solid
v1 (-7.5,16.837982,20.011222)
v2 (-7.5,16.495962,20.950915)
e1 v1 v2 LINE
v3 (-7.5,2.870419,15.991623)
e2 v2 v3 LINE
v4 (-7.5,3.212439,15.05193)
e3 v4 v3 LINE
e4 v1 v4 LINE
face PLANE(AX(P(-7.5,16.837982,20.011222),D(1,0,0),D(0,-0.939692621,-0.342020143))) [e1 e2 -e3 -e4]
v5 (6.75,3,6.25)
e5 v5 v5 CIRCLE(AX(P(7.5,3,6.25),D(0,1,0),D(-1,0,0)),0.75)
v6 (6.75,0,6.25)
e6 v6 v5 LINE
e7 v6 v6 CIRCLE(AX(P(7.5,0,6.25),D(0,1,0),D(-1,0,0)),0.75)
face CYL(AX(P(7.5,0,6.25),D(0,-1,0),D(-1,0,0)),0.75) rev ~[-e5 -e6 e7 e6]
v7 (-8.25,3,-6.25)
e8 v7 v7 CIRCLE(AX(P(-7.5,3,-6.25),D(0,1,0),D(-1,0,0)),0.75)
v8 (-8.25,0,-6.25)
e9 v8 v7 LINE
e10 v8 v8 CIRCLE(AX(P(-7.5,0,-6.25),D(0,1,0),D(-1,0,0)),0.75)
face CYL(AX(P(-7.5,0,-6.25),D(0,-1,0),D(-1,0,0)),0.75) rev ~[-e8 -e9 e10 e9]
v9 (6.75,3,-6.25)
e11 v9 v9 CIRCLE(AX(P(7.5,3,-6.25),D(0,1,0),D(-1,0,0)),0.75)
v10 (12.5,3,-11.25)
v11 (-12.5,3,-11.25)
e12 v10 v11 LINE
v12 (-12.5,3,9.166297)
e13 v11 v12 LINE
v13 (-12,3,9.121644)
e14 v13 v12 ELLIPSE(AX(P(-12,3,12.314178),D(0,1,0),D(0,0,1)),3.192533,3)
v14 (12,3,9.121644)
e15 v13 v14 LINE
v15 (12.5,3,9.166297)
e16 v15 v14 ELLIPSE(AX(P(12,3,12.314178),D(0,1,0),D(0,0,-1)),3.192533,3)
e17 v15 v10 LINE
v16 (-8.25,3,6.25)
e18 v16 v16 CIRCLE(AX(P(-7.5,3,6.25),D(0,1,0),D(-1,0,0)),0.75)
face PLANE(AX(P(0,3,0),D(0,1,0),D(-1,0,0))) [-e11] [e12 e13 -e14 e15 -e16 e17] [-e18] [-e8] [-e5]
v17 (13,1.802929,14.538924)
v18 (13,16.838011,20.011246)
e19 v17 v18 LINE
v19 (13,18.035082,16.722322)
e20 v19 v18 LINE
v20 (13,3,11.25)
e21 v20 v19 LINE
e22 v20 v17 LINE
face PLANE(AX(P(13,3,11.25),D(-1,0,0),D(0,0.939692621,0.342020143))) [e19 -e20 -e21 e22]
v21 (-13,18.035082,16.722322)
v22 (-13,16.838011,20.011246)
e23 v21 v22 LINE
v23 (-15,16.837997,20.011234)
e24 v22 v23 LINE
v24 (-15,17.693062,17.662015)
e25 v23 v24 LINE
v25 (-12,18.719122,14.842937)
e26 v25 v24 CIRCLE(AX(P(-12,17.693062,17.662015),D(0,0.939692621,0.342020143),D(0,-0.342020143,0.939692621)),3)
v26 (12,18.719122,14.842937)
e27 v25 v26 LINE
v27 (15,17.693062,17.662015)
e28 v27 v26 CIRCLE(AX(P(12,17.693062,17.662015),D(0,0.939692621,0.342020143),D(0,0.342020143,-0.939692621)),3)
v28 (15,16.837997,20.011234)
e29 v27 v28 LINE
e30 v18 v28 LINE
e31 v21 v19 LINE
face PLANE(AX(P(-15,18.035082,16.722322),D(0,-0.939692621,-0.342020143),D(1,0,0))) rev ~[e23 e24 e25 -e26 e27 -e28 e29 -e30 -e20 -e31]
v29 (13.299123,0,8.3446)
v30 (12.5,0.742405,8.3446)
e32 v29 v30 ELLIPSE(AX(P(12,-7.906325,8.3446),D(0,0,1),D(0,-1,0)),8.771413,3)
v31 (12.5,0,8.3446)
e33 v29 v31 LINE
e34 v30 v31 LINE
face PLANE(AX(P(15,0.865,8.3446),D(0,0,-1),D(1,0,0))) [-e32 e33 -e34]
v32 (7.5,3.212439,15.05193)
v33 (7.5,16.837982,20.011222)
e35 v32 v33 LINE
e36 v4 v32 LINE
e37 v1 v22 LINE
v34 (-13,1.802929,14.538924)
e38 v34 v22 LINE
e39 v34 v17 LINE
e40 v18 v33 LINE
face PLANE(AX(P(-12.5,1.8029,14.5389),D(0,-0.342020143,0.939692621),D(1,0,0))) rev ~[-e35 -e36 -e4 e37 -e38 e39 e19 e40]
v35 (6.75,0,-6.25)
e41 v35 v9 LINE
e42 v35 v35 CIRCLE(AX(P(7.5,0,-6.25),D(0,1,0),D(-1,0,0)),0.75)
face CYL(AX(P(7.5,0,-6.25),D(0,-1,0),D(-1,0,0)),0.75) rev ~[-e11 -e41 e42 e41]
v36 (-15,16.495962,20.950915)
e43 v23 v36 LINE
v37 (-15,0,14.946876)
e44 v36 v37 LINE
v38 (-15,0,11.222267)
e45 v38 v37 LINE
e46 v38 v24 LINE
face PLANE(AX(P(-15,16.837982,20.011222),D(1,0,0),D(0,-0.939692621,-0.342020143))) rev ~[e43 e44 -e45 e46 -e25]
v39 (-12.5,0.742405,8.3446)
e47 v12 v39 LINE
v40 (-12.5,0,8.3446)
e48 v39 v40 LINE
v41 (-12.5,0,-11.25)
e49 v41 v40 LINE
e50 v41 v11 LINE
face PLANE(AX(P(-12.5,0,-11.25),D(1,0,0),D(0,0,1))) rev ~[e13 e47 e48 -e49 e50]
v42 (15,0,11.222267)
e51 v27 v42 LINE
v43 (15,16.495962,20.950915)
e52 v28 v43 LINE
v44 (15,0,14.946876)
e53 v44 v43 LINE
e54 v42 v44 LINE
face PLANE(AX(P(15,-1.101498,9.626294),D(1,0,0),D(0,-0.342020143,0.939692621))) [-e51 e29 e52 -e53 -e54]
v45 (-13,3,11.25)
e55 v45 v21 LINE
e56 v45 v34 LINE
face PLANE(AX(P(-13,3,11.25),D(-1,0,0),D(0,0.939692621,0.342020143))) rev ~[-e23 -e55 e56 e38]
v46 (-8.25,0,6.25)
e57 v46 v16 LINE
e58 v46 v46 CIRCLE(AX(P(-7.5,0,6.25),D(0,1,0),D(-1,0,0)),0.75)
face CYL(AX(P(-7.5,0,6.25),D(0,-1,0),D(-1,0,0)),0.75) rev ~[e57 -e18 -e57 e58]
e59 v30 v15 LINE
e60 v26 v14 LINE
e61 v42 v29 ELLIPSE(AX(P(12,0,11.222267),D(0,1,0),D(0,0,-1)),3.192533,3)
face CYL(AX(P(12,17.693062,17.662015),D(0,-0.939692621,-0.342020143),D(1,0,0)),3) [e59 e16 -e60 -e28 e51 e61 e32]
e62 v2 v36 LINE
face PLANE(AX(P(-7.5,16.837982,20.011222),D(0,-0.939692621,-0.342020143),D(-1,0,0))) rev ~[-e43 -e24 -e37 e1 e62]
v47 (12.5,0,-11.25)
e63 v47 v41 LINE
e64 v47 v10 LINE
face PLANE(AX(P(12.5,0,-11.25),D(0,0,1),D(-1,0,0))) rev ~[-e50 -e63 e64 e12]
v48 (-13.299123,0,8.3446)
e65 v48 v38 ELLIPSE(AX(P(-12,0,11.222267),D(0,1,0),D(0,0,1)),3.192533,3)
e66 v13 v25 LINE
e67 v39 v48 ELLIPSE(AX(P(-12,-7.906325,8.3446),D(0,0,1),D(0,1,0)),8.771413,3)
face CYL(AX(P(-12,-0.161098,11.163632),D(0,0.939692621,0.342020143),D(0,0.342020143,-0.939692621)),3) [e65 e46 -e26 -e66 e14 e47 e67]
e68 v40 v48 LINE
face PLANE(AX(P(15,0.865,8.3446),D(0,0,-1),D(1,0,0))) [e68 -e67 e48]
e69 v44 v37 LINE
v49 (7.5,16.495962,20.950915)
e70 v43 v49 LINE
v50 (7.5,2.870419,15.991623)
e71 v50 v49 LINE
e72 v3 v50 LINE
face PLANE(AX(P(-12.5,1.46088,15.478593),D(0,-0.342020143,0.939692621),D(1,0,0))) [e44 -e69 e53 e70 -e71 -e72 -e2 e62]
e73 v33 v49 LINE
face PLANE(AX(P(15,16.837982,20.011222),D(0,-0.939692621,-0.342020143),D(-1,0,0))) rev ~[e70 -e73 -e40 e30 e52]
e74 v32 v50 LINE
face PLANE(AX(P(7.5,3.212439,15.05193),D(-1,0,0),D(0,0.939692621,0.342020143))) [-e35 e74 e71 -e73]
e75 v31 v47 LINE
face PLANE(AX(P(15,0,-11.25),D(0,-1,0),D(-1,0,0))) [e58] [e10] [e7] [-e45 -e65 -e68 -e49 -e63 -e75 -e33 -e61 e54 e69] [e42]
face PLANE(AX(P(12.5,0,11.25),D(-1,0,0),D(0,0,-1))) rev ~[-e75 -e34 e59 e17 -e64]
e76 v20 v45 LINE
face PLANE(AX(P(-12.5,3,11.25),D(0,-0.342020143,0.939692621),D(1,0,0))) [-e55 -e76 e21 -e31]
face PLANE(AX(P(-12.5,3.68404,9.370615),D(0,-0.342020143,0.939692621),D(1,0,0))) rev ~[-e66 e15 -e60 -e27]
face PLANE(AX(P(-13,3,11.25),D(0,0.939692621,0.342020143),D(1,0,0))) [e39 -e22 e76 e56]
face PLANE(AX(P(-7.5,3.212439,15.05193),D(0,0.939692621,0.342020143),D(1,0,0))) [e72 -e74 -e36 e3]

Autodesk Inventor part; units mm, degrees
ref_plane "YZ Plane" through (0, 0, 0) normal (1, 0, 0) x (0, 1, 0)
ref_plane "XZ Plane" through (0, 0, 0) normal (0, 1, 0) x (-1, 0, 0)
sketch "Sketch1" plane through (0, 0, 0) normal (0, 1, 0) x (-1, 0, 0)
  line L0 (12.5, 11.25) -> (-12.5, 11.25)
  line L1 (-12.5, 11.25) -> (-12.5, -11.25)
  line L2 (-12.5, -11.25) -> (12.5, -11.25)
  line L3 (12.5, -11.25) -> (12.5, 11.25)
  line L4 (12.5, 11.25) -> (-12.5, -11.25) construction
  line L5 (-12.5, 11.25) -> (12.5, -11.25) construction
  line L6 (7.5, 6.25) -> (-7.5, 6.25) construction
  line L7 (-7.5, 6.25) -> (-7.5, -6.25) construction
  line L8 (-7.5, -6.25) -> (7.5, -6.25) construction
  line L9 (7.5, -6.25) -> (7.5, 6.25) construction
  line L10 (7.5, 6.25) -> (-7.5, -6.25) construction
  line L11 (-7.5, 6.25) -> (7.5, -6.25) construction
  circle A0 centre (7.5, -6.25) radius 0.75
  circle A1 centre (-7.5, -6.25) radius 0.75
  circle A2 centre (-7.5, 6.25) radius 0.75
  circle A3 centre (7.5, 6.25) radius 0.75
  point P0 (0, 0)
  dimension "d0" = 12.5
  dimension "d1" = 15
  dimension "d2" = 5
  dimension "d3" = 5
  dimension "d4" = 1.5
  dimension "d5" = 1.5
  dimension "d6" = 1.5
  dimension "d7" = 1.5
extrude "Extrusion1" add sketch "Sketch1" along normal blind 3
ref_plane "Work Plane1" through (-12.5, 3, 11.25) normal (0, -0.3420201, 0.9396926) x (1, 0, 0)
sketch "Sketch2" plane through (-12.5, 3, 11.25) normal (0, -0.3420201, 0.9396926) x (1, 0, 0)
  line L0 (0, -7.6955) -> (0, 0) construction
  line L1 (25, 0) -> (25, -7.6955) construction
  line L2 (0, 0) -> (25, 0) construction
  line L3 (-2.5, 16) -> (27.5, 16)
  line L4 (27.5, 16) -> (27.5, -3)
  line L5 (27.5, -3) -> (-2.5, -3)
  line L6 (-2.5, -3) -> (-2.5, 16)
  line L7 (-2.5, 16) -> (27.5, -3) construction
  line L8 (27.5, 16) -> (-2.5, -3) construction
  point P0 (12.5, -6.6668)
  point P1 (12.5, 6.5)
  point P2 (12.5, 0)
  dimension "d11" = 19
  dimension "d12" = 16
  dimension "d13" = 30
extrude "Extrusion2" add sketch "Sketch2" against normal blind 2
sketch "Sketch3" plane through (-12.5, 3, 11.25) normal (0, -0.3420201, 0.9396926) x (1, 0, 0)
  line L0 (0, 0) -> (25, 0) construction
  line L1 (-0.5, 0) -> (25.5, 0) construction
  line L2 (25.5, 0) -> (25.5, 16) construction
  line L3 (25.5, 16) -> (-0.5, 16) construction
  line L4 (-0.5, 16) -> (-0.5, 0) construction
  line L5 (-0.5, 0) -> (25.5, 16) construction
  line L6 (25.5, 0) -> (-0.5, 16) construction
  line L7 (-2.5, -3) -> (-2.5, 16) construction
  line L8 (-0.5, 16) -> (-2.5, 16)
  line L9 (-2.5, 16) -> (-2.5, 0)
  line L10 (-2.5, 0) -> (-0.5, 0)
  line L11 (-0.5, 0) -> (-0.5, 16)
  line L12 (27.5, 16) -> (27.5, -3) construction
  line L13 (25.5, 16) -> (27.5, 16)
  line L14 (27.5, 16) -> (27.5, 0)
  line L15 (27.5, 0) -> (25.5, 0)
  line L16 (25.5, 0) -> (25.5, 16)
  line L17 (-2.5, 0) -> (27.5, 0)
  line L18 (27.5, 0) -> (27.5, -2)
  line L19 (27.5, -2) -> (-2.5, -2)
  line L20 (-2.5, -2) -> (-2.5, 0)
  point P0 (12.5, -6.6668)
  point P1 (12.5, 8)
  point P2 (12.5, 0)
  point P3 (-0.5, 0)
  dimension "d16" = 16
  dimension "d17" = 26
  dimension "d18" = 2
extrude "Extrusion3" add sketch "Sketch3" along normal blind 3.5
sketch "Sketch4" plane through (-12.5, 1.8029, 14.5389) normal (0, -0.3420201, 0.9396926) x (1, 0, 0)
  line L0 (-2.5, 16) -> (-2.5, -2) projected
  line L1 (-2.5, -2) -> (27.5, -2) projected
  line L2 (27.5, -2) -> (27.5, 16) projected
  line L3 (27.5, 16) -> (25.5, 16) construction
  line L4 (-0.5, 16) -> (-2.5, 16) construction
  line L5 (-2.5, -2) -> (27.5, -2) construction
  line L6 (27.5, -2) -> (27.5, 16) construction
  line L7 (27.5, 16) -> (-2.5, 16)
  line L8 (-2.5, 16) -> (-2.5, -2) construction
  line L9 (5, 1.5) -> (20, 1.5)
  line L10 (20, 1.5) -> (20, 16)
  line L11 (20, 16) -> (5, 16)
  line L12 (5, 16) -> (5, 1.5)
  line L13 (5, 1.5) -> (20, 16) construction
  line L14 (20, 1.5) -> (5, 16) construction
  point P0 (12.5, -6.6668)
  point P1 (12.5, 8.75)
  point P2 (12.5, 16)
  point P3 (20, 16)
  dimension "d21" = 15
  dimension "d23" = 3.5
extrude "Extrusion4" add sketch "Sketch4" along normal blind 1 contours L7 L12 L9 L10 L2 L1 L0
sketch "Sketch5" plane through (12.5, 1.1206, 10.566) normal (0, -0.9396926, -0.3420201) x (1, 0, 0)
  line L0 (2.5, 0) -> (2.5, 4.5) projected
  line L1 (0, 0) -> (0, 0.7279) projected
  line L2 (2.5, 0) -> (0, 0) projected
  line L3 (-27.5, 4.5) -> (2.5, 4.5) projected
  line L4 (0, 0.7279) -> (-25, 0.7279) projected
  line L5 (-25, 0) -> (-27.5, 0) projected
  line L6 (-27.5, 0) -> (-27.5, 4.5) projected
  line L7 (-25, 0.7279) -> (-25, 0) projected
  point P0 (-12.5, -9.5455)
extrude "Extrusion5" add sketch "Sketch5" along normal blind 1
sketch "Sketch6" plane through (12.5, 0.865, 8.3446) normal (0, -0.9396926, -0.3420201) x (1, 0, 0)
  line L0 (2.5, 0) -> (0, 0) projected
  line L1 (-25, 2.7279) -> (0, 2.7279) projected
  line L2 (-25, 0) -> (-27.5, 0) projected
  line L3 (2.5, 0) -> (-27.5, 0)
  line L4 (-27.5, 0) -> (-27.5, 2.7279)
  line L5 (-27.5, 2.7279) -> (2.5, 2.7279)
  line L6 (2.5, 2.7279) -> (2.5, 0)
  point P0 (-12.5, -7.5455)
  point P1 (-25, 0)
  point P2 (0, 0)
  point P3 (0, 2.7279)
sketch3d "3D Sketch1"
  line L0 (12.5, 3, -11.25) -> (12.5, 0, -11.25)
sweep "Sweep1" add profiles "Sketch6" path "3D Sketch1"
sketch "Sketch7" plane through (12.5, 0, -11.25) normal (0, 0, -1) x (-1, 0, 0)
  line L0 (-2.5, 0) -> (27.5, 0)
  line L1 (27.5, 0) -> (27.5, -3.068)
  line L2 (27.5, -3.068) -> (-2.5, -3.068)
  line L3 (-2.5, -3.068) -> (-2.5, 0)
  line L4 (0, 0) -> (25, 0) projected
  line L5 (27.5, 0.865) -> (27.5, -2.135) projected
  line L6 (-2.5, 0.865) -> (-2.5, -2.135) projected
  line L7 (-2.5, -3.068) -> (27.5, -3.068) projected
  point P0 (12.5, 0)
extrude "Extrusion6" cut sketch "Sketch7" against normal through all
fillet "Fillet1" radius 3 2 edges at (15, 9.792, 11.5937) (-15, 9.792, 11.5937)
equation "\"d5\" = d4"
equation "\"d6\" = d4"
equation "\"d7\" = d4"
properties part number "camera-mount"
